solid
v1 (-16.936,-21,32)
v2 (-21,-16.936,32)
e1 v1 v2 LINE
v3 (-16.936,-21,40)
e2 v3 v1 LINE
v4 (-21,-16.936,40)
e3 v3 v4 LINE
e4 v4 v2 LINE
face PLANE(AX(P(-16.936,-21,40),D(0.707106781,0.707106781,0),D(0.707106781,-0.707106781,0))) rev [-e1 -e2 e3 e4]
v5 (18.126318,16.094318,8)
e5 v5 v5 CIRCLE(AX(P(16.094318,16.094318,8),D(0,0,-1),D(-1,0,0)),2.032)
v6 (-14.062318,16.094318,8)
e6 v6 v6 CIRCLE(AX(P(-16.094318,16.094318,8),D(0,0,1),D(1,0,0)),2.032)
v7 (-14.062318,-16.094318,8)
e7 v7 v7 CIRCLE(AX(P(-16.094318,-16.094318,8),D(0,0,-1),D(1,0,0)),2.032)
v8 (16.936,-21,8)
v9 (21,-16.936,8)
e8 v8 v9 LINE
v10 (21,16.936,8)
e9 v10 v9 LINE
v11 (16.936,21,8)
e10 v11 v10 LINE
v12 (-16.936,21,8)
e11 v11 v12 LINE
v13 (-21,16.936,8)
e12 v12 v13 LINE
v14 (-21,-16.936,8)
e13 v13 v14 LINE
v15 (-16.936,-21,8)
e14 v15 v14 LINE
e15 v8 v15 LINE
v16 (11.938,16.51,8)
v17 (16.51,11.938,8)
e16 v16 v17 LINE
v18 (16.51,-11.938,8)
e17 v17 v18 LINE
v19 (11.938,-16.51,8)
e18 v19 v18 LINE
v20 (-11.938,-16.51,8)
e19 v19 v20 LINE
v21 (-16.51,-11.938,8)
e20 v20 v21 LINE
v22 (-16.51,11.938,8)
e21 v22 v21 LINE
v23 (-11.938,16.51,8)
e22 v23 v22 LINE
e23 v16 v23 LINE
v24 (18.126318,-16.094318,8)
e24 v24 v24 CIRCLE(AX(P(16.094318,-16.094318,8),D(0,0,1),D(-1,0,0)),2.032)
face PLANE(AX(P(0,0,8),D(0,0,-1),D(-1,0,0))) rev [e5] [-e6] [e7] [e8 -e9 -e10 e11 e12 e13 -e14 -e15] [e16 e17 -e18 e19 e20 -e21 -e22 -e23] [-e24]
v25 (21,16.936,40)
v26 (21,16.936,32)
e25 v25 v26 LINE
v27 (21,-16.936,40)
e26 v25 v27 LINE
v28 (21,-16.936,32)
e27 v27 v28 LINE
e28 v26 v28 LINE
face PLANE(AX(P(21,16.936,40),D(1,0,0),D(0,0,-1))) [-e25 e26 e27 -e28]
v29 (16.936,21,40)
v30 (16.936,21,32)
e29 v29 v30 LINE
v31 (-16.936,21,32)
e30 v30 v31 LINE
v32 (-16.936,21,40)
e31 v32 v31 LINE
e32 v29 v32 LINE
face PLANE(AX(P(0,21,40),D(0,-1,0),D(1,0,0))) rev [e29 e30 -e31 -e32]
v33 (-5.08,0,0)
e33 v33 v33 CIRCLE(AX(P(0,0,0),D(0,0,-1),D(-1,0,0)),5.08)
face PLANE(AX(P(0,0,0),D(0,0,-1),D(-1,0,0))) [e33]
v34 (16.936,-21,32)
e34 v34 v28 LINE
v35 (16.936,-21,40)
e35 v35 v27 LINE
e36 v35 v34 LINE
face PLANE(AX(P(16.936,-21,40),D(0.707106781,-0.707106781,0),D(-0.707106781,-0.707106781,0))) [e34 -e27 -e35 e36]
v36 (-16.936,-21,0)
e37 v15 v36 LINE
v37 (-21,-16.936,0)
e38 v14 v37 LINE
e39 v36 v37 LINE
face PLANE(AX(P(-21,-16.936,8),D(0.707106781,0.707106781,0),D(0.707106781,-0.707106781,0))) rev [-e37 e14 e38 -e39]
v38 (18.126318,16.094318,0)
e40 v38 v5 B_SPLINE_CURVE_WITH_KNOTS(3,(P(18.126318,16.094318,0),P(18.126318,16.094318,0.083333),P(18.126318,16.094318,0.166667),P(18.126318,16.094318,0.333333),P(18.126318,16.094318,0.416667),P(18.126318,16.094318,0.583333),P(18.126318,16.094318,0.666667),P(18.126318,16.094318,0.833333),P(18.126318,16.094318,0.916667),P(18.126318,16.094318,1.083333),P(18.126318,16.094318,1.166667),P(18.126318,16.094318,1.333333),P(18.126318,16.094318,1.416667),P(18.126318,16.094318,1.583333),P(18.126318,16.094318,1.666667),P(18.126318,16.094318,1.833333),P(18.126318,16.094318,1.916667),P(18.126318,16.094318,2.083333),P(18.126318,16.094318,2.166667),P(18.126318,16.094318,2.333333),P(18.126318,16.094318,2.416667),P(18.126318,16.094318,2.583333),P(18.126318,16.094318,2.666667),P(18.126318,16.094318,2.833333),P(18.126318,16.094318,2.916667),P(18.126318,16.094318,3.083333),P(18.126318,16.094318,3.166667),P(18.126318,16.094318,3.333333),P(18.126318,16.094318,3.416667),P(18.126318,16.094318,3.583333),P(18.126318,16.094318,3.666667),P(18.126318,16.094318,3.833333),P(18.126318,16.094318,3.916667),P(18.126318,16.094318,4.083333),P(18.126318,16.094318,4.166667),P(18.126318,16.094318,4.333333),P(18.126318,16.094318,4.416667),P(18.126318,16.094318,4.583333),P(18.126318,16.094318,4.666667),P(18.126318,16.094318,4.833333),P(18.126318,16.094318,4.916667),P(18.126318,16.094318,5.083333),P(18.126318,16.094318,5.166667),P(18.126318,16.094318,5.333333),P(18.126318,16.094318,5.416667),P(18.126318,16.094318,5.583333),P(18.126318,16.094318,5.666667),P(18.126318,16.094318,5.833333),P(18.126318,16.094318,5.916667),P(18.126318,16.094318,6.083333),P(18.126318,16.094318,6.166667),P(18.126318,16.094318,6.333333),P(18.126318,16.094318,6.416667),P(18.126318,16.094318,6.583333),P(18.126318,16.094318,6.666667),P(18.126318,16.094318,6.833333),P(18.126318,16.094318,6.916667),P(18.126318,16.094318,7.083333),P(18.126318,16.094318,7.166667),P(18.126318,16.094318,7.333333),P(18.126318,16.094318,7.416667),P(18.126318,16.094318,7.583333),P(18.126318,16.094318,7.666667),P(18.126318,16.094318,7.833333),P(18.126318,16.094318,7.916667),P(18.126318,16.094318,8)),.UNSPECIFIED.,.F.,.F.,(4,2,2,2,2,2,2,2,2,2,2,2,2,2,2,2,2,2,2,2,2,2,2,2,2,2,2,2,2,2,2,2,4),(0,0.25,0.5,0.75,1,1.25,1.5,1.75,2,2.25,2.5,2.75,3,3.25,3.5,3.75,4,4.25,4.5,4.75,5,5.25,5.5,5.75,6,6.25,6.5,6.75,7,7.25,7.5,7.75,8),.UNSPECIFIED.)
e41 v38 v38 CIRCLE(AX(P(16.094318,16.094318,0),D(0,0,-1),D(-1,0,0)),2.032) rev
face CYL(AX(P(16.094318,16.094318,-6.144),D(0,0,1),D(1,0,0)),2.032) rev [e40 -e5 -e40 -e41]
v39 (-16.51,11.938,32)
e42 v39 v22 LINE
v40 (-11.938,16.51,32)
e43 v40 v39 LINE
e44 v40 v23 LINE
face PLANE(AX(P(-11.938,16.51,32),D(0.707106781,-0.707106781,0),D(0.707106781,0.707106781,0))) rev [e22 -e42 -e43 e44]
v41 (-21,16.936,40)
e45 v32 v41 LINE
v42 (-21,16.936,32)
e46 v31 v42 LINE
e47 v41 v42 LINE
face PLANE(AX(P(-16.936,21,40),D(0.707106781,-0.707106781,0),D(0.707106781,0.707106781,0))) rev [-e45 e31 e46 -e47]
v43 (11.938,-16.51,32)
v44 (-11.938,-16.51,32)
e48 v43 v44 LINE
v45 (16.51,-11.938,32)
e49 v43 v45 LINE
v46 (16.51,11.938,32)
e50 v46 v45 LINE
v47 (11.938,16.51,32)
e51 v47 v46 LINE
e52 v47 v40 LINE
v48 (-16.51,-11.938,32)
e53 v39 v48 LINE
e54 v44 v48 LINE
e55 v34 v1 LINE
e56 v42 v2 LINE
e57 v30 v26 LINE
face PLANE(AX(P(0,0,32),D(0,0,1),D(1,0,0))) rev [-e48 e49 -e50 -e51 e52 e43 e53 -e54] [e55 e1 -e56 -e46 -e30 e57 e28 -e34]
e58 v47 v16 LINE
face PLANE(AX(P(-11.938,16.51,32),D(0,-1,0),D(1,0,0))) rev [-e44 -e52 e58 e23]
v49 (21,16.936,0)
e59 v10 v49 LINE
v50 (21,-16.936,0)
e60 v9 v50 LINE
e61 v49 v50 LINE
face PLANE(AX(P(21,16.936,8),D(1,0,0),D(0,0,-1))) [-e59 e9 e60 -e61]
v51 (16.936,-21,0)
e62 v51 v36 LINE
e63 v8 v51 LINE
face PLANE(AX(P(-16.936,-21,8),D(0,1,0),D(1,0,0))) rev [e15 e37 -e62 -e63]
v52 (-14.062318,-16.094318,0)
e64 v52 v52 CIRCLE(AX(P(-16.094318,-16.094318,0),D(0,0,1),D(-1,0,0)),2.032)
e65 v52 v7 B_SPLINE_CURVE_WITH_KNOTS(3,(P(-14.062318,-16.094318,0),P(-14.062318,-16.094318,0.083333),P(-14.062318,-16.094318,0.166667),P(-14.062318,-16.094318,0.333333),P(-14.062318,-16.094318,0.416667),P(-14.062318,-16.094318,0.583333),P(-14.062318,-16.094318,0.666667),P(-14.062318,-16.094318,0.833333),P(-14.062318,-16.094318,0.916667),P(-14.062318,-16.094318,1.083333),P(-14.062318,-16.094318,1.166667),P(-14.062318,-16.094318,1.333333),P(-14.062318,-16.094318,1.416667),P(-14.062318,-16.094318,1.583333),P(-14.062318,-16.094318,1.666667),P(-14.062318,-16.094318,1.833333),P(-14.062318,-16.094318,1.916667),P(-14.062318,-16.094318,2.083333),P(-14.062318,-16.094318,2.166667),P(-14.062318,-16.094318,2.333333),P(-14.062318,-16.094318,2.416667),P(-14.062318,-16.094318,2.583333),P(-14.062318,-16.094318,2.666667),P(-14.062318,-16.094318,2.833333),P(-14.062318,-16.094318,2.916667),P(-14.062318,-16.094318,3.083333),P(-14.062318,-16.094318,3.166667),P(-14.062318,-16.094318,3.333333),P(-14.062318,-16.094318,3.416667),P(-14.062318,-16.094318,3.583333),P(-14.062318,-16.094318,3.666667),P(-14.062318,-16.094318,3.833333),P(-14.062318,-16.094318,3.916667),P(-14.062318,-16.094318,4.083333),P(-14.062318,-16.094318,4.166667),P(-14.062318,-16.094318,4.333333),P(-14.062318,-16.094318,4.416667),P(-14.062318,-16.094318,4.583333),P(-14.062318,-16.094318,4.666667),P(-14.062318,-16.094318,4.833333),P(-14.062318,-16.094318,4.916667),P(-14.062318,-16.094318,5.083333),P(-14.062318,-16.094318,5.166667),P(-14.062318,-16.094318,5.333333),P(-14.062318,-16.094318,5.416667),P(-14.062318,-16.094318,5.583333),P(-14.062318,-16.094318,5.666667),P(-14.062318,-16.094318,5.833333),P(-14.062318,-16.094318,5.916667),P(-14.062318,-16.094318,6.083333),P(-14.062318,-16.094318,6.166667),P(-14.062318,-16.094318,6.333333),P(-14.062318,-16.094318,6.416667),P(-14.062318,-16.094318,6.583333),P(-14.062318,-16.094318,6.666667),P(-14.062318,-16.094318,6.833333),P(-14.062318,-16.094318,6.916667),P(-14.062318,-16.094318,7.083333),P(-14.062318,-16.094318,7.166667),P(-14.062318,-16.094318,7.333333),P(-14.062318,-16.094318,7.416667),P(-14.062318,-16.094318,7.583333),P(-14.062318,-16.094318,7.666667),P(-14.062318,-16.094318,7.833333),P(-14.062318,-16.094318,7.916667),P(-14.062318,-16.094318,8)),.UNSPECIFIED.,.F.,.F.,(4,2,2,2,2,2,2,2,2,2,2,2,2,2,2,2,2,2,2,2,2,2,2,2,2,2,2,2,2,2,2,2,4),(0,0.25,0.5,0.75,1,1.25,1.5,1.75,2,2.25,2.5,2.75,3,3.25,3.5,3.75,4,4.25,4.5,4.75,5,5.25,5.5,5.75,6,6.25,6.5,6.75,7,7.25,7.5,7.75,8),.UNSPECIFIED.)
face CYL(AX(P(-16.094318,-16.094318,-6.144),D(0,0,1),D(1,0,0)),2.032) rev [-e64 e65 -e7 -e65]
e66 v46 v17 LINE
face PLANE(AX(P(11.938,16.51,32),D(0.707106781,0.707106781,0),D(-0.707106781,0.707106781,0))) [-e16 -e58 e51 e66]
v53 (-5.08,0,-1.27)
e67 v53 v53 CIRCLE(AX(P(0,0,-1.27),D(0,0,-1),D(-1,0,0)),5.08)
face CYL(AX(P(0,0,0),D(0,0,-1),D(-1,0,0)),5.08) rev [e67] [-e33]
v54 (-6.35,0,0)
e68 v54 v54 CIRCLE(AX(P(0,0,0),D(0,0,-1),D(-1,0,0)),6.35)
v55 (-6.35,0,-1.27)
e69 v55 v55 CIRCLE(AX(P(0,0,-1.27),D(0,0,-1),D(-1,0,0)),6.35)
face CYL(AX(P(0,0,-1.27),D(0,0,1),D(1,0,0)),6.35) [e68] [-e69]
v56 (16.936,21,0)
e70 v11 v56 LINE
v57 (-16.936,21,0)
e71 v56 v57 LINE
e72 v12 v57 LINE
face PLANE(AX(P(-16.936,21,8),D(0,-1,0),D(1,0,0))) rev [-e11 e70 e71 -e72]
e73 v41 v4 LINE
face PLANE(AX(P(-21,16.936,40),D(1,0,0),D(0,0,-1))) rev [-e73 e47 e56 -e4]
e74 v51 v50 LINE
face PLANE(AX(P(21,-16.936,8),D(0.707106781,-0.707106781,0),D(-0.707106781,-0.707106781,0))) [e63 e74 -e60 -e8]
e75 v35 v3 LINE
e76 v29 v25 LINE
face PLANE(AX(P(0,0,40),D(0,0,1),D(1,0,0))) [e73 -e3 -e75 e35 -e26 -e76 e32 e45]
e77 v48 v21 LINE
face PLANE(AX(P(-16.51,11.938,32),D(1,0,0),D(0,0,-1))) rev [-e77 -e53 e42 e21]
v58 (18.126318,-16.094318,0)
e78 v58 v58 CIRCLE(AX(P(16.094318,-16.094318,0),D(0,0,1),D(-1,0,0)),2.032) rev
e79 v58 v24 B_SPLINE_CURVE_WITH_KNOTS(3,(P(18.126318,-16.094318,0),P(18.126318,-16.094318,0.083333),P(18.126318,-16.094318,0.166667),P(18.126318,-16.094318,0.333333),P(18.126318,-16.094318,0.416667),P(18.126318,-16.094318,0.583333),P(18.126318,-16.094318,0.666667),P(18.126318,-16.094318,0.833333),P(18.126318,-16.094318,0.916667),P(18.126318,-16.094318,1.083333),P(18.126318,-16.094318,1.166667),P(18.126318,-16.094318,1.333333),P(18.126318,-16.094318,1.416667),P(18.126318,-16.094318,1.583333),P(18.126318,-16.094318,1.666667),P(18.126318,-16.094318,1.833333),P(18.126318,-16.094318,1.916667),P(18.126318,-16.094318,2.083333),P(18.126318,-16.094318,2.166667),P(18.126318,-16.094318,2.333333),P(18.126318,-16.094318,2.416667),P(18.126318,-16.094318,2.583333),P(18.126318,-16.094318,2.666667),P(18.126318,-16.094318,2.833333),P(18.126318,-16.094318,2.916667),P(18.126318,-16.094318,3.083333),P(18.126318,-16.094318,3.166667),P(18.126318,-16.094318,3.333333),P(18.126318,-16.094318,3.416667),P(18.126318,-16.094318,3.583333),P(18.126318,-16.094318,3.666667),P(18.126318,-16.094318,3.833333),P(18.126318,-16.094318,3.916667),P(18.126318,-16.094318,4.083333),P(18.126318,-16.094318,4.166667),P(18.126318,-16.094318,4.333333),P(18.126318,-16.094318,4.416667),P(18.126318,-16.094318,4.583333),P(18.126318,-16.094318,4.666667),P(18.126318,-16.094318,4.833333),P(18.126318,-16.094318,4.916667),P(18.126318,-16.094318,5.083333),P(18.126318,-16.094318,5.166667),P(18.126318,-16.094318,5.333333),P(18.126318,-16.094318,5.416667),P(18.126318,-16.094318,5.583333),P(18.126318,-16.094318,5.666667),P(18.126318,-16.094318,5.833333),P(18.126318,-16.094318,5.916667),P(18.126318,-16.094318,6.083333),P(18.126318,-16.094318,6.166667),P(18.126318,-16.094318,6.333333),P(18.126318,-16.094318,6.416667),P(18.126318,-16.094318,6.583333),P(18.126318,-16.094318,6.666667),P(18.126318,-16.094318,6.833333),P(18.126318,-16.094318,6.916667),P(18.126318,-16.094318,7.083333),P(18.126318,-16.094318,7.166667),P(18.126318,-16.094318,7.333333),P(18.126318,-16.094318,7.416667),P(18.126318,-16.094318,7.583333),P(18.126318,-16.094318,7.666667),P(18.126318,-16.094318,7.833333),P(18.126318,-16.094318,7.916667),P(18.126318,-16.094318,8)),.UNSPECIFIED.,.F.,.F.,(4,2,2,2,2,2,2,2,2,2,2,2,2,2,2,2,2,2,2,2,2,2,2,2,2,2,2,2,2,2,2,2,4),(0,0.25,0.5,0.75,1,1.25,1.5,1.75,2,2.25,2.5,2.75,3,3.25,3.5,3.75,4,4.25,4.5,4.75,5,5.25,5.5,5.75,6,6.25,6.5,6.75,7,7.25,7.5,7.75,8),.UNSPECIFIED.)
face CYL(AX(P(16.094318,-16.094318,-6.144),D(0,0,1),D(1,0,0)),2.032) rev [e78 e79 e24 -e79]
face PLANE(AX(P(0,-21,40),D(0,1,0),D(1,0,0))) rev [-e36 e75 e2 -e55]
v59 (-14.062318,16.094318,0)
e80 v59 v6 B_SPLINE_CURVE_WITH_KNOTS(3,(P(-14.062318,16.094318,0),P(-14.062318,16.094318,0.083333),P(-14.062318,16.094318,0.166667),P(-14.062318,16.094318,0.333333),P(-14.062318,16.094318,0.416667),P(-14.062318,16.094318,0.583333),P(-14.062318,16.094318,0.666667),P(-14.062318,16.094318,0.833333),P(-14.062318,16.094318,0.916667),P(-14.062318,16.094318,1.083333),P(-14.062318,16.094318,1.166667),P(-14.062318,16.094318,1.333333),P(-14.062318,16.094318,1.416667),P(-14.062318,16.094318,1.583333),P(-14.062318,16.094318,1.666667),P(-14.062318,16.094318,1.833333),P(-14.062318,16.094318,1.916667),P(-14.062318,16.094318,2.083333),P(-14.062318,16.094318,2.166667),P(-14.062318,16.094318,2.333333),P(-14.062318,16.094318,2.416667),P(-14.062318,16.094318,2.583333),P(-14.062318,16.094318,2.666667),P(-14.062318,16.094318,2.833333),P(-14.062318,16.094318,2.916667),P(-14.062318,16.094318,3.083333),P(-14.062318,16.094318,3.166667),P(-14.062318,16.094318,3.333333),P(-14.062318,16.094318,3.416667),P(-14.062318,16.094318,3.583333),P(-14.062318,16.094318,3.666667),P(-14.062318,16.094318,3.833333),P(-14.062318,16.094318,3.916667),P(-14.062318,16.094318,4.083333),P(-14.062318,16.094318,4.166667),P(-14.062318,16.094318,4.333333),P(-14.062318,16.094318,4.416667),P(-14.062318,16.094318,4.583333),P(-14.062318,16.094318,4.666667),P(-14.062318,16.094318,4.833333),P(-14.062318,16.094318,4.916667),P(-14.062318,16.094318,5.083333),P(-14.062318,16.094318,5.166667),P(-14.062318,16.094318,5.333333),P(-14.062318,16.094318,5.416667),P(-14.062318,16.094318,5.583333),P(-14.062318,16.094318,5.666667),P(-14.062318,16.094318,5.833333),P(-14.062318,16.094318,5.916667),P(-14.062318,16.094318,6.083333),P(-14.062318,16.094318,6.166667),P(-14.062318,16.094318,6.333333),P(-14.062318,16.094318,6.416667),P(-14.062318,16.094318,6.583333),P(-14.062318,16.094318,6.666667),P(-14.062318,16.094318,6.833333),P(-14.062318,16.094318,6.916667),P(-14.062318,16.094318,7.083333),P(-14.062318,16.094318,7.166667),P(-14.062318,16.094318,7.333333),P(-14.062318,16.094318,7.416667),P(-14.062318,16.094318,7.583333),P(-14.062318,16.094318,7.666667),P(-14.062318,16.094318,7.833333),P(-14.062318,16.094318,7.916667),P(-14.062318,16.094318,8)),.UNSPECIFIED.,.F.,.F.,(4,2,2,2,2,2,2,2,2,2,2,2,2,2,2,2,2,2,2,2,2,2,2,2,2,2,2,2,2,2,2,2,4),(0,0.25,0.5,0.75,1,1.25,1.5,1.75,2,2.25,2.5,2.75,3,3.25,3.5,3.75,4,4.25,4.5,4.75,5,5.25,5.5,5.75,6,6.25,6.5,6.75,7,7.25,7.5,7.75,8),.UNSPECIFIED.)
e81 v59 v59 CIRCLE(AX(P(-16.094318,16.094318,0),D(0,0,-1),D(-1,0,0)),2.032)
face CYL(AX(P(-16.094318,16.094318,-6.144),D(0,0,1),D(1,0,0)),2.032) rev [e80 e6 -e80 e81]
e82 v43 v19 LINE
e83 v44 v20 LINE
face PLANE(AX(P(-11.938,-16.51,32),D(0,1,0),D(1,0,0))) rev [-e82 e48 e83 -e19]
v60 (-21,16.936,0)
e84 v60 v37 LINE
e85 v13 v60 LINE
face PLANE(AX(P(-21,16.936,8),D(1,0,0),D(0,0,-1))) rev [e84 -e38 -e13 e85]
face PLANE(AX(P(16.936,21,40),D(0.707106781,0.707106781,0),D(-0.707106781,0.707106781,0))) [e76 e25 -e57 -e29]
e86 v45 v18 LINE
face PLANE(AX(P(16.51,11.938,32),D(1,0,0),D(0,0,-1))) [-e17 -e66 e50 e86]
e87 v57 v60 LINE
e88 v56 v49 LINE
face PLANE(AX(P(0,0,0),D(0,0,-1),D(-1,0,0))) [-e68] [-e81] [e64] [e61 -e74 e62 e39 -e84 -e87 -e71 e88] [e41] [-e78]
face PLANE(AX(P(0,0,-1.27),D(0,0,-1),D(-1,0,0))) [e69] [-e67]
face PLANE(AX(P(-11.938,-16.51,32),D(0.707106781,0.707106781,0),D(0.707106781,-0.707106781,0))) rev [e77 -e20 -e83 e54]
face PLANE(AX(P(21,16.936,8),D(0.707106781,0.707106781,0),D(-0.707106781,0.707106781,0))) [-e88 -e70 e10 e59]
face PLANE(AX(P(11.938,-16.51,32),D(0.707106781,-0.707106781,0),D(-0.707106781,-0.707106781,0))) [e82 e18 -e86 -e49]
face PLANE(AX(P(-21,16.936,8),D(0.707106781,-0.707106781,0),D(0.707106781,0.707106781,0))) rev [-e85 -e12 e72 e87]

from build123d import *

# Parameters (mm, degrees)
BOSS_EXTRUDE1_DEPTH = 8
SKETCH2_R           = 2.032
CUT_EXTRUDE1_DEPTH  = 14.144
BOSS_EXTRUDE2_DEPTH = 24
BOSS_EXTRUDE3_DEPTH = 8
BOSS_EXTRUDE4_DEPTH = 1.27
CUT_EXTRUDE2_DEPTH  = 1.27
MIRROR2_DEPTH       = 40
MIRROR2_START       = 32
MIRROR2_2_DEPTH     = 8
MIRROR2_3_OUTLINE_R = 2.032
MIRROR2_3_DEPTH     = 8
MIRROR2_START_2     = -1.27
MIRROR2_4_DEPTH     = 1.27


# Read off the part's stored shape, not the designer's step: Mirror2
with BuildPart() as part:
    # Sketch1 → Boss-Extrude1 (new body)
    with BuildSketch(Plane.XY):
        Polygon((-21, 16.936), (-21, 0), (0, 0), (0, 21), (-16.936, 21), align=None)
    boss_extrude1 = extrude(amount=BOSS_EXTRUDE1_DEPTH)

    # Sketch2 → Cut-Extrude1 (cut)
    with BuildSketch(Plane.XY.offset(8)):
        with Locations((-16.094318041, 16.094318041)):
            Circle(SKETCH2_R)
    cut_extrude1 = extrude(amount=-CUT_EXTRUDE1_DEPTH, mode=Mode.SUBTRACT)

    # Sketch4 → Boss-Extrude2 (add)
    with BuildSketch(Plane.XY.offset(8)):
        Polygon((0, 0), (-16.51, 0), (-16.51, 11.938), (-11.938, 16.51), (0, 16.51), align=None)
    boss_extrude2 = extrude(amount=BOSS_EXTRUDE2_DEPTH)

    # Sketch5 → Boss-Extrude3 (add)
    with BuildSketch(Plane.XY.offset(32)):
        Polygon((0, 0), (0, 21), (-16.936, 21), (-21, 16.936), (-21, 0), align=None)
    boss_extrude3 = extrude(amount=BOSS_EXTRUDE3_DEPTH)

    # Sketch6 → Boss-Extrude4 (add)
    with BuildSketch(Plane(origin=(0, 0, 0), x_dir=(-1, 0, 0), z_dir=(0, 0, -1))):
        with BuildLine():
            Line((0, 6.35), (0, 0))
            Line((0, 0), (6.35, 0))
            ThreePointArc((6.35, 0), (4.490128061, 4.490128061), (0, 6.35))
        make_face()
    boss_extrude4 = extrude(amount=BOSS_EXTRUDE4_DEPTH)

    # Sketch7 → Cut-Extrude2 (cut)
    with BuildSketch(Plane(origin=(0, 0, -1.27), x_dir=(-1, 0, 0), z_dir=(0, 0, -1))):
        with BuildLine():
            Line((0, 5.08), (0, 0))
            Line((0, 0), (5.08, 0))
            ThreePointArc((5.08, 0), (3.592102448, 3.592102448), (0, 5.08))
        make_face()
    cut_extrude2 = extrude(amount=-CUT_EXTRUDE2_DEPTH, mode=Mode.SUBTRACT)

    # Mirror1: Boss-Extrude1, Cut-Extrude1, Boss-Extrude2, Boss-Extrude3, Boss-Extrude4, Cut-Extrude2 across Right Plane
    add(boss_extrude1.mirror(Plane(origin=(0, 0, 0), x_dir=(0, 0, -1), z_dir=(1, 0, 0))))
    add(cut_extrude1.mirror(Plane(origin=(0, 0, 0), x_dir=(0, 0, -1), z_dir=(1, 0, 0))), mode=Mode.SUBTRACT)
    add(boss_extrude2.mirror(Plane(origin=(0, 0, 0), x_dir=(0, 0, -1), z_dir=(1, 0, 0))))
    add(boss_extrude3.mirror(Plane(origin=(0, 0, 0), x_dir=(0, 0, -1), z_dir=(1, 0, 0))))
    add(boss_extrude4.mirror(Plane(origin=(0, 0, 0), x_dir=(0, 0, -1), z_dir=(1, 0, 0))))
    add(cut_extrude2.mirror(Plane(origin=(0, 0, 0), x_dir=(0, 0, -1), z_dir=(1, 0, 0))), mode=Mode.SUBTRACT)

    # Mirror2 outline → Mirror2 (add)
    with BuildSketch(Plane.XY):
        Polygon((-16.51, 0), (-16.51, -11.938), (-11.938, -16.51), (11.938, -16.51), (16.51, -11.938), (16.51, 0), align=None)
    extrude(amount=MIRROR2_DEPTH)

    # Mirror2 2 outline → Mirror2 2 (add)
    with BuildSketch(Plane.XY.offset(MIRROR2_START)):
        Polygon((-21, 0), (-21, -16.936), (-16.936, -21), (16.936, -21), (21, -16.936), (21, 0), (16.51, 0), (16.51, -11.938), (11.938, -16.51), (-11.938, -16.51), (-16.51, -11.938), (-16.51, 0), align=None)
    extrude(amount=MIRROR2_2_DEPTH)

    # Mirror2 3 outline → Mirror2 3 (add)
    with BuildSketch(Plane.XY):
        Polygon((-21, 0), (-21, -16.936), (-16.936, -21), (16.936, -21), (21, -16.936), (21, 0), (16.51, 0), (16.51, -11.938), (11.938, -16.51), (-11.938, -16.51), (-16.51, -11.938), (-16.51, 0), align=None)
        with Locations((-16.094318041, -16.094318041)):
            Circle(MIRROR2_3_OUTLINE_R, mode=Mode.SUBTRACT)
        with Locations((16.094318041, -16.094318041)):
            Circle(MIRROR2_3_OUTLINE_R, mode=Mode.SUBTRACT)
    extrude(amount=MIRROR2_3_DEPTH)

    # Mirror2 4 outline → Mirror2 4 (add)
    with BuildSketch(Plane.XY.offset(MIRROR2_START_2)):
        with BuildLine():
            Line((-5.08, 0), (-6.35, 0))
            ThreePointArc((-6.35, 0), (0, -6.35), (6.35, 0))
            Line((6.35, 0), (5.08, 0))
            ThreePointArc((5.08, 0), (0, -5.08), (-5.08, 0))
        make_face()
    extrude(amount=MIRROR2_4_DEPTH)


solid = part.part
